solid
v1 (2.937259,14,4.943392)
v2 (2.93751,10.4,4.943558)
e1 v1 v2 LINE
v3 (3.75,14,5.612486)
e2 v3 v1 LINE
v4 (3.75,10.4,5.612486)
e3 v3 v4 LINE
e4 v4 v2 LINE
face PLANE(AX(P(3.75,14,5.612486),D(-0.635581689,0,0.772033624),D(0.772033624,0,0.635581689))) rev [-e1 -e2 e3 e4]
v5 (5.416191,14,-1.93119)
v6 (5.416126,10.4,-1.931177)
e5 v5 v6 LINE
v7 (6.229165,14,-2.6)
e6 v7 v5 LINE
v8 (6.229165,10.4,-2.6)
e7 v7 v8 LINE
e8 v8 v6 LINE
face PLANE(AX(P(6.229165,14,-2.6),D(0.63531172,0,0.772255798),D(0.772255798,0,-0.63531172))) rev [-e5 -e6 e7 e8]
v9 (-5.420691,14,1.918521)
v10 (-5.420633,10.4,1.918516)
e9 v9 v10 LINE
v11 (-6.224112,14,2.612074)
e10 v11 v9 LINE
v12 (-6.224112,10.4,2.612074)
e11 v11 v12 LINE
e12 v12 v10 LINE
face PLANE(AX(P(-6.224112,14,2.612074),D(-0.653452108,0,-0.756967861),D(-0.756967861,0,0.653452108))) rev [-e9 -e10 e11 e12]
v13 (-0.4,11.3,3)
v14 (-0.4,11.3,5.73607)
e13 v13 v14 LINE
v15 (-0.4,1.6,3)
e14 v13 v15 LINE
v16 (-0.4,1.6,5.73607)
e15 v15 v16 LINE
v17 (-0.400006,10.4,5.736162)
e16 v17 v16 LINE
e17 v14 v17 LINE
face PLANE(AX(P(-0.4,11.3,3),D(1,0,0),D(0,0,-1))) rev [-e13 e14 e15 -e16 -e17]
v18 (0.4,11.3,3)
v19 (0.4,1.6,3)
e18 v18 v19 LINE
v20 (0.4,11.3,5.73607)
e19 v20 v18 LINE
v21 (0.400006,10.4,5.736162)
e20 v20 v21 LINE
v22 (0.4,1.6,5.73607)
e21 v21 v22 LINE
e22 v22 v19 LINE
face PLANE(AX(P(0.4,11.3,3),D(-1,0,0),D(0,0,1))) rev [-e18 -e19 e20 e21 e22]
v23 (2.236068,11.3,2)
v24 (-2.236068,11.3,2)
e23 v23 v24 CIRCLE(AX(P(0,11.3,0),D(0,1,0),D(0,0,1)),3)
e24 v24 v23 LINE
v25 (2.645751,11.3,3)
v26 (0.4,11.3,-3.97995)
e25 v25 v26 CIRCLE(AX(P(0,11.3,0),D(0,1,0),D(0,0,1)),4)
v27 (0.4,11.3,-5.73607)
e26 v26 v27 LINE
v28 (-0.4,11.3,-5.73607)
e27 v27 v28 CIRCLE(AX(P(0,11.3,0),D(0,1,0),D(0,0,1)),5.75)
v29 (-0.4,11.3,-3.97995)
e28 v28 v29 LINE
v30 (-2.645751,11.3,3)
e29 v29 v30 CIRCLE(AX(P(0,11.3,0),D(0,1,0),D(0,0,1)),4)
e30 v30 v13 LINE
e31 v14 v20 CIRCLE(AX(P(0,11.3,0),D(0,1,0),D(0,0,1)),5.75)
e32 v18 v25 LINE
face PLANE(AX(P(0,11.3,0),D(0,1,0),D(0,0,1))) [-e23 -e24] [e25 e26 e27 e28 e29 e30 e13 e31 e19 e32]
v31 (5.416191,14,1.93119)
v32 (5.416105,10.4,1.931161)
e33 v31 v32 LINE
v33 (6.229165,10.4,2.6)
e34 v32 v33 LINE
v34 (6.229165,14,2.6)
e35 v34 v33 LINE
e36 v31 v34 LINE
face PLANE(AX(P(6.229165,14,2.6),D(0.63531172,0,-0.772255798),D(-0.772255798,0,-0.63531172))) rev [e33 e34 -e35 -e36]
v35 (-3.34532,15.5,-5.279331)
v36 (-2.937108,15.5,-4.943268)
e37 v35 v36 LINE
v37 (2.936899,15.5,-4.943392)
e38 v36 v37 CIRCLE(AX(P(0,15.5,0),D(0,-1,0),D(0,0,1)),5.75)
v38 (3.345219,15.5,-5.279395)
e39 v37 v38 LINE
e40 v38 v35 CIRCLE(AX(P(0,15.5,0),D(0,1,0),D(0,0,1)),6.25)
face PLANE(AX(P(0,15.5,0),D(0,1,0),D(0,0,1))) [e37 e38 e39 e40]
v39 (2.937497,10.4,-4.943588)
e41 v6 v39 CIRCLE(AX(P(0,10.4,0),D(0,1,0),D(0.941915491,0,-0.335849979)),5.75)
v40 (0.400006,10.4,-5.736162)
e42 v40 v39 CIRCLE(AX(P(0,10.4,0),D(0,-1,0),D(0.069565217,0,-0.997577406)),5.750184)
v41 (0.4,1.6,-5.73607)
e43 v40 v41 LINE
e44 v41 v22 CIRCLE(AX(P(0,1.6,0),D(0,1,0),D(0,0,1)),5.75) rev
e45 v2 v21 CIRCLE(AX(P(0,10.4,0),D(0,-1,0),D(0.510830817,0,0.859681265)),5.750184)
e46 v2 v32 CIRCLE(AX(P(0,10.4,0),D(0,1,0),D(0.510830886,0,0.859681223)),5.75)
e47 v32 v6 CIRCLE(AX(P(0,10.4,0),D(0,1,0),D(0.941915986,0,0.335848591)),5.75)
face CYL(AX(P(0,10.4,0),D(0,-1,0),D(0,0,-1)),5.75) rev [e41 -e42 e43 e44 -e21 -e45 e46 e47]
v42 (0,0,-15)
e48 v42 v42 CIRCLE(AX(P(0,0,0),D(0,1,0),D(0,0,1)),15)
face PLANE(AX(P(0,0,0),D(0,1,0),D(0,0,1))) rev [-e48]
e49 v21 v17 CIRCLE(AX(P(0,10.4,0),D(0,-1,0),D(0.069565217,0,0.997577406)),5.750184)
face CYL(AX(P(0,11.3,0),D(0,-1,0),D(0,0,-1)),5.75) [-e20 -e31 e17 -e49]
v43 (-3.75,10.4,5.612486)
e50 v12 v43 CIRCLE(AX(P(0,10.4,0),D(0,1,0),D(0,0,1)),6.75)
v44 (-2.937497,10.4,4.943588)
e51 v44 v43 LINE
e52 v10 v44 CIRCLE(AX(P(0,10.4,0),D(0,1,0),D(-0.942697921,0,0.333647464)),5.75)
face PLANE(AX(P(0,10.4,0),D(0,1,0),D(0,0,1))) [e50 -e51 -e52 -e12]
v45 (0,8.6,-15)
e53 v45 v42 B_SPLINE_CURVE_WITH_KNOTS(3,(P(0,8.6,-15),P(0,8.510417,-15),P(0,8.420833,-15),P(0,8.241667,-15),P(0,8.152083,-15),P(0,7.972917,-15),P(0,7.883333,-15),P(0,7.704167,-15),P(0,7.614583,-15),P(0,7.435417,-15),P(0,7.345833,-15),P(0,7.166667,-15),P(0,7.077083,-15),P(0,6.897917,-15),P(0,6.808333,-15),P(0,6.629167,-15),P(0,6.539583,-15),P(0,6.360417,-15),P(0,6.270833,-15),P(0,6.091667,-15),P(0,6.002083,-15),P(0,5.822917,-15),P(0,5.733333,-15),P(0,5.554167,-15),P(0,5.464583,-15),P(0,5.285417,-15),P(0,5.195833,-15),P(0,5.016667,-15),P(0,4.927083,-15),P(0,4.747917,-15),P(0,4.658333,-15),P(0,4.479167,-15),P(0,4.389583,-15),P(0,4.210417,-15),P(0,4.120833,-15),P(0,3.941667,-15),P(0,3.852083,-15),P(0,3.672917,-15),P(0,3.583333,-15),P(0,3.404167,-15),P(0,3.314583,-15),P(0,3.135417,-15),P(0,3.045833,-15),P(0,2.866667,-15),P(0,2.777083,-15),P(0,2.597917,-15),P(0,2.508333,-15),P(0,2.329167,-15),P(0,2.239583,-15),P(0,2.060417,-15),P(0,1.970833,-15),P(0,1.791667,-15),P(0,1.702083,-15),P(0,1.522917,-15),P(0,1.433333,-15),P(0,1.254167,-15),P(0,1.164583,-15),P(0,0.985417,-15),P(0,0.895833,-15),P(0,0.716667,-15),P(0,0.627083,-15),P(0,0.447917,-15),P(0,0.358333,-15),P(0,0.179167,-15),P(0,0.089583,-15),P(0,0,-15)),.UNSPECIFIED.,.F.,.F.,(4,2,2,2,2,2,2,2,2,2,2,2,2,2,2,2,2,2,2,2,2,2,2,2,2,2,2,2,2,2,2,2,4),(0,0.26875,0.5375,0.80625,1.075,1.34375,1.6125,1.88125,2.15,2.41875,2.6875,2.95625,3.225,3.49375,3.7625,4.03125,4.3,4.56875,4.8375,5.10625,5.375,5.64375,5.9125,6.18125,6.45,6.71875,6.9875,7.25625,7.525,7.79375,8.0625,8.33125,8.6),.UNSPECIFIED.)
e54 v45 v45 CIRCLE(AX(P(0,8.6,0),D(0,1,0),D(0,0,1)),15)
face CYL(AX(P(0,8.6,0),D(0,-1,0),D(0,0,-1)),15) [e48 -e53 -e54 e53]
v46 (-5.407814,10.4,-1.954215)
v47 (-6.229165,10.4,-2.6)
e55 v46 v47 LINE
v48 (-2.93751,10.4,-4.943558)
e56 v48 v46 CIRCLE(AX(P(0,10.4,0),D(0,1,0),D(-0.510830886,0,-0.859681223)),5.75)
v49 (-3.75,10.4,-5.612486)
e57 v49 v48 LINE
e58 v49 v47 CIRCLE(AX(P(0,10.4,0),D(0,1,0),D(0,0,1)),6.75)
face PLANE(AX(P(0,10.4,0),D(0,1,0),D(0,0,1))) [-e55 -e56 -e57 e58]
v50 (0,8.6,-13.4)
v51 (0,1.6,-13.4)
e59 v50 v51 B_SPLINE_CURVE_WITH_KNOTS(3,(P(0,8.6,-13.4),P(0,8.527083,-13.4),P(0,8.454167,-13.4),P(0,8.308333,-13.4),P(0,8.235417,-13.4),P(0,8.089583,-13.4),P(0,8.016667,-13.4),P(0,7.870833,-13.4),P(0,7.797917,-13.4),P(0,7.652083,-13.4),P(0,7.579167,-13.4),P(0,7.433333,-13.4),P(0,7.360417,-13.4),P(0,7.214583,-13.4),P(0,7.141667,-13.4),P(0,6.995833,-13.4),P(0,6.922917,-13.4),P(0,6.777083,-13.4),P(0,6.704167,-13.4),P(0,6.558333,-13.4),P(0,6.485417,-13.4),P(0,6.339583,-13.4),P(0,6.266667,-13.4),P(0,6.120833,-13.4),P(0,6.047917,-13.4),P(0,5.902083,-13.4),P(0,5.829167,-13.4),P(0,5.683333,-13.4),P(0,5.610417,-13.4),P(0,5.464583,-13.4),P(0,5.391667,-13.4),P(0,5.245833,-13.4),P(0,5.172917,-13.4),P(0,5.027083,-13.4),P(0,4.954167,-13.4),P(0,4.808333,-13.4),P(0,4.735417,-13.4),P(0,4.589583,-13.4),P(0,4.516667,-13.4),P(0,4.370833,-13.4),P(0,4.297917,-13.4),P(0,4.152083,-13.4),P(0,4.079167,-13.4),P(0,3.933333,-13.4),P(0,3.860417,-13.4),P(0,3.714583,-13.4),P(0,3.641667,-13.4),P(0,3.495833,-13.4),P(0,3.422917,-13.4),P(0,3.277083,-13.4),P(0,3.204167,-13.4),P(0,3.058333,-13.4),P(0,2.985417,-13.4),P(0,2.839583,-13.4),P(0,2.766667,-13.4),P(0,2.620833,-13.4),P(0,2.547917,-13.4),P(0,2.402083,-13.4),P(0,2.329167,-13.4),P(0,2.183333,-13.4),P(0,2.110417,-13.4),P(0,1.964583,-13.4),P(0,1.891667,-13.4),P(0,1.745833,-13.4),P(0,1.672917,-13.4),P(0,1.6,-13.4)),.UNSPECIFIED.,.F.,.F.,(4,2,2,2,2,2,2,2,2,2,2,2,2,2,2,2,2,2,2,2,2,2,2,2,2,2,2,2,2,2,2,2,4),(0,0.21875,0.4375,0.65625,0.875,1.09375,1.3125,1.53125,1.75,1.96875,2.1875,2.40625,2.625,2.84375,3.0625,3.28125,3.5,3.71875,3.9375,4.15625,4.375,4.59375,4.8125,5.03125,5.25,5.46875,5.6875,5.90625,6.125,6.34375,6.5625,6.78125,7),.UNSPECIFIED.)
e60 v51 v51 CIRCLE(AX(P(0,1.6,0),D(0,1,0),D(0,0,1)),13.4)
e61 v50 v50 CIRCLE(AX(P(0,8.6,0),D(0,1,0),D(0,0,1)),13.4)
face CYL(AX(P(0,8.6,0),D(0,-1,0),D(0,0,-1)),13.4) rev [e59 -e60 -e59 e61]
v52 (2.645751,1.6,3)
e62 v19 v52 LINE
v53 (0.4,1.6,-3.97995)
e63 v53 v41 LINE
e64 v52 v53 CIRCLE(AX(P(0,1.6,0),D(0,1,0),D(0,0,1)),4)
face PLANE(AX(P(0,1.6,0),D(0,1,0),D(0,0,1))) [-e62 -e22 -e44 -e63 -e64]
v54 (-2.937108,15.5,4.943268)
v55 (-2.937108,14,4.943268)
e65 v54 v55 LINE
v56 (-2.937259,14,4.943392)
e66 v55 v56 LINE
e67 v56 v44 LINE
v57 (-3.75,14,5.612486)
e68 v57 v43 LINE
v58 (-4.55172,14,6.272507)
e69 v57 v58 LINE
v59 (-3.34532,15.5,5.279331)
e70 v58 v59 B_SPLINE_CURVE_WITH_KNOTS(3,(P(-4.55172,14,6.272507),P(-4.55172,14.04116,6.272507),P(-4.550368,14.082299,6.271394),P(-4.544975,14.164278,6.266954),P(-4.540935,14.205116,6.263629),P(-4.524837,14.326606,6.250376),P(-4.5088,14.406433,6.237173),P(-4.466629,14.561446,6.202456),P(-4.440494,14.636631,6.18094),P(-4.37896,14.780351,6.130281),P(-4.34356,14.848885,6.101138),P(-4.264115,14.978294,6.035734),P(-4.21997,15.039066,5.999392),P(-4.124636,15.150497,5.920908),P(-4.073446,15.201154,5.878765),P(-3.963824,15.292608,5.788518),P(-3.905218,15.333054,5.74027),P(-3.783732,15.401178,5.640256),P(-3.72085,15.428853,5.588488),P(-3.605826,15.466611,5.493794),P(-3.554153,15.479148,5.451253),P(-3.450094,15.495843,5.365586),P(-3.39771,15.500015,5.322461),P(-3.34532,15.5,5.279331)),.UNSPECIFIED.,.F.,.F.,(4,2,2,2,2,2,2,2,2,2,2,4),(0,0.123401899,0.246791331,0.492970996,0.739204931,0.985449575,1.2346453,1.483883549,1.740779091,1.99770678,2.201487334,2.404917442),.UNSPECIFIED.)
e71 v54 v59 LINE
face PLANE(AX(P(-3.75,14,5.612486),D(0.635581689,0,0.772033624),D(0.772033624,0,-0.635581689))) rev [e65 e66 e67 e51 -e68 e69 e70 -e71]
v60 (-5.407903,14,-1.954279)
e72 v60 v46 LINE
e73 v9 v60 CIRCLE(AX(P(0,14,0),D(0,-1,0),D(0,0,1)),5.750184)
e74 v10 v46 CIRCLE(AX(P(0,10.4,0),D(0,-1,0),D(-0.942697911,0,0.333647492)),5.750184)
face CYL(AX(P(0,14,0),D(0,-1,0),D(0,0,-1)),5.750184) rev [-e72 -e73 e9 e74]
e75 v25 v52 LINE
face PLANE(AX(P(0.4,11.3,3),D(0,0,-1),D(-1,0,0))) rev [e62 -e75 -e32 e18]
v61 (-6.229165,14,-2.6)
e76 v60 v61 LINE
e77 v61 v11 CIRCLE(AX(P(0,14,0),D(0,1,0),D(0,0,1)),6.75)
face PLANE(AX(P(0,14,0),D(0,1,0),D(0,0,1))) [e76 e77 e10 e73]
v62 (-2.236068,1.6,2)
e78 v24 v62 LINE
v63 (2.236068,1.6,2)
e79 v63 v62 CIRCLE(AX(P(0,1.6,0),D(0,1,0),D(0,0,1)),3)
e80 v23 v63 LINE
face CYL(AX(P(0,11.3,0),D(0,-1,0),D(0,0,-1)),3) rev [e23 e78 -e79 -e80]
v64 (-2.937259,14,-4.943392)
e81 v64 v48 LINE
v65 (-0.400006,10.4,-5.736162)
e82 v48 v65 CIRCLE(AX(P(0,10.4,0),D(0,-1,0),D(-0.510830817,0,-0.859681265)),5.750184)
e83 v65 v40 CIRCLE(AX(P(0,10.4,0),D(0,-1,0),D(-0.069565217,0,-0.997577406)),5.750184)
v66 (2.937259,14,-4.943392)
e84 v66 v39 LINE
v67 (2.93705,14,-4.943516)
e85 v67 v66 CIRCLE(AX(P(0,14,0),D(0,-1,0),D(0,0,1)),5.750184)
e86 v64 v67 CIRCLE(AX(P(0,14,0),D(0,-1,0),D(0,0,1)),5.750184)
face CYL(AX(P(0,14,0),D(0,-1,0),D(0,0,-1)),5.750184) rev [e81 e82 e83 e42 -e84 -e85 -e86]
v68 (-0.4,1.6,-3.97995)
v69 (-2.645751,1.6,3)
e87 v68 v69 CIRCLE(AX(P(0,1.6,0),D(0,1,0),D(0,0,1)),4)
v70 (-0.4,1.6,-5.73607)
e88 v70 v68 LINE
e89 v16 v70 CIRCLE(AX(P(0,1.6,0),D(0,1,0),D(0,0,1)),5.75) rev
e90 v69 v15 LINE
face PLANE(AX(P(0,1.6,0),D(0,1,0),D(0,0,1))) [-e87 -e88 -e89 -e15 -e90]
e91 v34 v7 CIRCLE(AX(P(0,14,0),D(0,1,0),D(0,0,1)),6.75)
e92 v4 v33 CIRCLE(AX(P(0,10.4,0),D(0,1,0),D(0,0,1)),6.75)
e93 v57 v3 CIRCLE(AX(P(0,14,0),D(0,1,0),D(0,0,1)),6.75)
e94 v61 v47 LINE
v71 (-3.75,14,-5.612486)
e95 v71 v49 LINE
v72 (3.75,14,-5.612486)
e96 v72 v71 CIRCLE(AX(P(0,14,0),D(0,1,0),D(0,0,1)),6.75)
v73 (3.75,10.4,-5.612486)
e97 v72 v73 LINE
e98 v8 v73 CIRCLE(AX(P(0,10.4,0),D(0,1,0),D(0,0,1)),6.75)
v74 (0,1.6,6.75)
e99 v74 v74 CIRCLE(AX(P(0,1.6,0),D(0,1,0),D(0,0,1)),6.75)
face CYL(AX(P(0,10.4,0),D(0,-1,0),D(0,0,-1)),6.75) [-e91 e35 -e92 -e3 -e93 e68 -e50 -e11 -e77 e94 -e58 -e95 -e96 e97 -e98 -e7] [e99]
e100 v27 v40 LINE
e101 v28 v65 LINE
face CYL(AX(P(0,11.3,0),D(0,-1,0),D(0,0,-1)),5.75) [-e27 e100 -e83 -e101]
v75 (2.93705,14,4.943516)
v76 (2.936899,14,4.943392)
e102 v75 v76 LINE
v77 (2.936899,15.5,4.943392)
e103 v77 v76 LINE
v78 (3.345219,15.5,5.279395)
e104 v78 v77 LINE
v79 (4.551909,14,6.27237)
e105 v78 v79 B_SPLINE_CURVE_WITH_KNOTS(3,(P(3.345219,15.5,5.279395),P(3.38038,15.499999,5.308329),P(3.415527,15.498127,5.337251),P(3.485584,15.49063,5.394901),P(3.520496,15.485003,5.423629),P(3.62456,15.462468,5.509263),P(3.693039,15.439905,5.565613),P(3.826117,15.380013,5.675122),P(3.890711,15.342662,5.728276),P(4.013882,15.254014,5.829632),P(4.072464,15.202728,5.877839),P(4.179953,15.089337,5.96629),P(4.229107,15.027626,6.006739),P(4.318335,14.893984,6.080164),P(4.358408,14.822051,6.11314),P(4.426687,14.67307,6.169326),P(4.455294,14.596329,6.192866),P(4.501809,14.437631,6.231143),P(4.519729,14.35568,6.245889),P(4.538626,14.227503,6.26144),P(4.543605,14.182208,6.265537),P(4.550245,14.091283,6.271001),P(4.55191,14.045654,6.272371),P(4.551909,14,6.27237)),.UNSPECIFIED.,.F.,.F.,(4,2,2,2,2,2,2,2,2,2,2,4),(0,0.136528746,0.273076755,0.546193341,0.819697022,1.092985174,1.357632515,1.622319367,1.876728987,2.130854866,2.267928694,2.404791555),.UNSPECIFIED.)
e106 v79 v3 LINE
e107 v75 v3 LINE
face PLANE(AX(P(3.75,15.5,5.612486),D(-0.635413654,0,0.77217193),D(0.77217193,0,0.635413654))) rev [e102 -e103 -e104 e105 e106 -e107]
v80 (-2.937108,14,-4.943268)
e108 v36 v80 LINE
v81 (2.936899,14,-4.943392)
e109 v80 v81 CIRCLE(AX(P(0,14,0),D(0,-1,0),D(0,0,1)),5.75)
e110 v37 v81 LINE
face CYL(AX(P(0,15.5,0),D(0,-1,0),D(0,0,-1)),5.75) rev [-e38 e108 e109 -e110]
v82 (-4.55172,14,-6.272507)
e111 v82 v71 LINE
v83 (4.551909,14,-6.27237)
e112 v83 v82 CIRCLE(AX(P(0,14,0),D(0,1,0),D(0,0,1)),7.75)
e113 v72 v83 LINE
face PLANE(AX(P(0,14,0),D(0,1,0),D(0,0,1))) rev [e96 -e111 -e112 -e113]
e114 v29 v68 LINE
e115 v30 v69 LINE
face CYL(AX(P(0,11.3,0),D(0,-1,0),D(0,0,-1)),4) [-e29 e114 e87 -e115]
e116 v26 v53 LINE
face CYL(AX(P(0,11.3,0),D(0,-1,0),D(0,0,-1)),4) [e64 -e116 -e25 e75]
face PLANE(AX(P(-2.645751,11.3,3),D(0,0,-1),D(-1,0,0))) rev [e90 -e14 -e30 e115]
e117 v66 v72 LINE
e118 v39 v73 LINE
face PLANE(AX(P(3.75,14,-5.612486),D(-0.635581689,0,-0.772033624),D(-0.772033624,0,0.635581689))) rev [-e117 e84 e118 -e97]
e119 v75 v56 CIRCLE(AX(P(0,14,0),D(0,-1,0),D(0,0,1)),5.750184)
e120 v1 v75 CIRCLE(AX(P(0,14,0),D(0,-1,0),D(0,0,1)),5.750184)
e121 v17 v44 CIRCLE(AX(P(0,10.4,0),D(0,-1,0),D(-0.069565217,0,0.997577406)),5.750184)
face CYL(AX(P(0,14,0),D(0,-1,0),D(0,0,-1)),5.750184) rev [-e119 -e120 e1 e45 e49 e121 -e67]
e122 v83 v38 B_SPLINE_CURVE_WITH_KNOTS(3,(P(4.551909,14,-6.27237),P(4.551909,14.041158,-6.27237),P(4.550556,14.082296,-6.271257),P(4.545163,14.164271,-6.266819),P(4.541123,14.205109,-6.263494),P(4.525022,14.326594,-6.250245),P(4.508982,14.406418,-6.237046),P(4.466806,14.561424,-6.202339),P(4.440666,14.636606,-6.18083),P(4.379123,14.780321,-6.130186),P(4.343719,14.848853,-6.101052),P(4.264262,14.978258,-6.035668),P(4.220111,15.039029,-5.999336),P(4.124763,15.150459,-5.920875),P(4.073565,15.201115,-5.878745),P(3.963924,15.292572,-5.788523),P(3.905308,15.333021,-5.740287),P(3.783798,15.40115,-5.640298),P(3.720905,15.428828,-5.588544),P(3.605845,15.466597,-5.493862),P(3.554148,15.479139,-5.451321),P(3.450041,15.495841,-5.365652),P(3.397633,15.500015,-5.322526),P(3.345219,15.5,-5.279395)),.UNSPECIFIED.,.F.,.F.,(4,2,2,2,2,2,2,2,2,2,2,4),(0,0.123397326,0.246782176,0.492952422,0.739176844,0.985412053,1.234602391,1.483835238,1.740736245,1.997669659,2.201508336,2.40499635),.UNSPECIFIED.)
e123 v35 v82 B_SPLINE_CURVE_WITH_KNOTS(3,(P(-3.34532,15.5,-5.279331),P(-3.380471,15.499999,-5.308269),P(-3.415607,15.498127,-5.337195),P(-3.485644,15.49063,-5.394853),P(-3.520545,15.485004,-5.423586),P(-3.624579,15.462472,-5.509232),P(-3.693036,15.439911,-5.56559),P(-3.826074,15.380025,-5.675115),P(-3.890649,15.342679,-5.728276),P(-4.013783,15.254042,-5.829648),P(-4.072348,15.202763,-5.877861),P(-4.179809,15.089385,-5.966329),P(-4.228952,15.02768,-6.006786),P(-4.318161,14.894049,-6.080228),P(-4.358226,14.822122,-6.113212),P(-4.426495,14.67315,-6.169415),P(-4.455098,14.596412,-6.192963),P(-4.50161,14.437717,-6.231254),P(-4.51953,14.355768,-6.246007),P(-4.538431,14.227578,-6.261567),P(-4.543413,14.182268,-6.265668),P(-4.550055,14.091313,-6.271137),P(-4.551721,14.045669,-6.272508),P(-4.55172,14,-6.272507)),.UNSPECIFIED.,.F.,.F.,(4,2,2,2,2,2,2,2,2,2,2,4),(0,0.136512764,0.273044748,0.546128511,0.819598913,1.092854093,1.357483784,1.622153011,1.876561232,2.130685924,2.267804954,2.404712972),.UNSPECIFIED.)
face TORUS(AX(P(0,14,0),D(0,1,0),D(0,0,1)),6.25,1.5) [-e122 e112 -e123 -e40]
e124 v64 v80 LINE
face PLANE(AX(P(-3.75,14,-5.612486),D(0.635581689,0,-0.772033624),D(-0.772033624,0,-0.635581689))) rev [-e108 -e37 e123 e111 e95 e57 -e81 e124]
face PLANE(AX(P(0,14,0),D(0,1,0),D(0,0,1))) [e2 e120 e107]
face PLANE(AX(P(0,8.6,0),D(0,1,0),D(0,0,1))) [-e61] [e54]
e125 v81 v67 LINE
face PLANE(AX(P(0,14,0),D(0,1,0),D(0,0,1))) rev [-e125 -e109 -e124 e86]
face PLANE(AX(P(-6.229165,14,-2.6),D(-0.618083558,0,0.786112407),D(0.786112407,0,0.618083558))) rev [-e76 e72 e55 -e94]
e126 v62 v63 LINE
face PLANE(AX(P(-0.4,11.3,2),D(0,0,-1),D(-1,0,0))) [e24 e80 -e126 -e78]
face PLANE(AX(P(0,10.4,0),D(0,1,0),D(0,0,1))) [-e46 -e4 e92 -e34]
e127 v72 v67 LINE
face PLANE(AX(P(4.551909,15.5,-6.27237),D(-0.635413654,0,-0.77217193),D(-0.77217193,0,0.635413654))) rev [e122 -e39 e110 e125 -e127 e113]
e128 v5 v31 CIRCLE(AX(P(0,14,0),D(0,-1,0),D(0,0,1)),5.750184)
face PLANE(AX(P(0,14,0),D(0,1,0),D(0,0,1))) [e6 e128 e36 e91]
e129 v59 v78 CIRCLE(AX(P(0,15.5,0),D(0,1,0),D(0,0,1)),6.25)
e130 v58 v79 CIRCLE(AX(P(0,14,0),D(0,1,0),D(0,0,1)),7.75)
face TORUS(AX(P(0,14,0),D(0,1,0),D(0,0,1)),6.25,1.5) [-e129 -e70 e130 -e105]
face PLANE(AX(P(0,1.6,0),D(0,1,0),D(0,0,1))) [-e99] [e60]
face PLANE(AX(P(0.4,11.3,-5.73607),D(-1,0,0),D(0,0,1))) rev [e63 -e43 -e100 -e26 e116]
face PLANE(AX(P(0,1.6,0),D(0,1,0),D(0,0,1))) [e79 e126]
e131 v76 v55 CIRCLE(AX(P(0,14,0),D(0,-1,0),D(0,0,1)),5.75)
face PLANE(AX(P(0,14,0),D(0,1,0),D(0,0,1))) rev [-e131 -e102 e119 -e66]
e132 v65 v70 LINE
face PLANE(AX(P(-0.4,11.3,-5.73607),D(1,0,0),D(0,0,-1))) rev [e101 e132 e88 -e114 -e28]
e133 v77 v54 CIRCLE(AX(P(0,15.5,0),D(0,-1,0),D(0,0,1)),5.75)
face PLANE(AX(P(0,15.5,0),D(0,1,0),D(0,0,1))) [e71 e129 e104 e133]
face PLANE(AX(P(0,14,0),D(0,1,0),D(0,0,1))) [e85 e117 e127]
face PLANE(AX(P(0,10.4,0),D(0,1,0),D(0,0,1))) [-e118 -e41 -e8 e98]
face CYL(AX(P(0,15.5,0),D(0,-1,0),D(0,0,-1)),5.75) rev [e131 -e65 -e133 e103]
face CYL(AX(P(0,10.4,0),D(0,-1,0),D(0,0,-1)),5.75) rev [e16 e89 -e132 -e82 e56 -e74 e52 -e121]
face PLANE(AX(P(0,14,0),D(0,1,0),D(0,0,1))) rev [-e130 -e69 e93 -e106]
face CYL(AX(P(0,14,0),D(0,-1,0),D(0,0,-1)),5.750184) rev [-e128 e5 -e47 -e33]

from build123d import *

# Parameters (mm, degrees)
SKETCH_1_R      = 15
EXTRUDE_1_DEPTH = 8.6
SHELL_1_T       = -1.6
SKETCH_2_R      = 6.75
SKETCH_2_R_2    = 5.75
EXTRUDE_2_DEPTH = 8.8
EXTRUDE_4_DEPTH = 3.6
EXTRUDE_7_DEPTH = 1.5
FILLET_2_R      = 1.5
EXTRUDE_8_DEPTH = 9.7


with BuildPart() as part:
    # 草图1 → 凸台-拉伸1 (new body)
    with BuildSketch(Plane(origin=(0, 0, 0), x_dir=(1, 0, 0), z_dir=(0, 1, 0))):
        with Locations(Location((0, 0, 0), (0, 0, 90))):
            Circle(SKETCH_1_R)
    extrude(amount=EXTRUDE_1_DEPTH)

    # 抽壳1
    shell_1_openings = [part.faces().sort_by_distance(p)[0] for p in [
        (0, 8.6, 0),
    ]]
    offset(amount=SHELL_1_T, openings=shell_1_openings, kind=Kind.INTERSECTION)

    # 草图2 → 凸台-拉伸2 (add)
    with BuildSketch(Plane(origin=(0, 1.6, 0), x_dir=(1, 0, 0), z_dir=(0, 1, 0))):
        with Locations(Location((0, 0, 0), (0, 0, 270))):
            Circle(SKETCH_2_R)
        with Locations(Location((0, 0, 0), (0, 0, 270))):
            Circle(SKETCH_2_R_2, mode=Mode.SUBTRACT)
    extrude(amount=EXTRUDE_2_DEPTH)

    # 草图5 → 凸台-拉伸4 (add)
    with BuildSketch(Plane(origin=(0, 10.4, 0), x_dir=(1, 0, 0), z_dir=(0, 1, 0))):
        with BuildLine():
            Line((-6.229165273, 2.6), (-5.407902558, 1.954279393))
            ThreePointArc((-5.407902558, 1.954279393), (-5.750152822, 0.018988088), (-5.420691276, -1.918521336))
            Line((-5.420691276, -1.918521336), (-6.224112, -2.612073854))
            ThreePointArc((-6.224112, -2.612073854), (-6.749996828, -0.006544339), (-6.229165273, 2.6))
        make_face()
        with BuildLine():
            Line((-3.75, 5.61248608), (-2.937259379, 4.943392091))
            ThreePointArc((-2.937259379, 4.943392091), (0, 5.750184173), (2.937259379, 4.943392091))
            Line((2.937259379, 4.943392091), (3.75, 5.61248608))
            ThreePointArc((3.75, 5.61248608), (0, 6.75), (-3.75, 5.61248608))
        make_face()
        with BuildLine():
            Line((6.229165273, 2.6), (5.416190763, 1.931190215))
            ThreePointArc((5.416190763, 1.931190215), (5.750184173, 0), (5.416190763, -1.931190215))
            Line((5.416190763, -1.931190215), (6.229165273, -2.6))
            ThreePointArc((6.229165273, -2.6), (6.75, 0), (6.229165273, 2.6))
        make_face()
        with BuildLine():
            Line((3.75, -5.61248608), (2.937259379, -4.943392091))
            ThreePointArc((2.937259379, -4.943392091), (0, -5.750184173), (-2.937259379, -4.943392091))
            Line((-2.937259379, -4.943392091), (-3.75, -5.61248608))
            ThreePointArc((-3.75, -5.61248608), (0, -6.75), (3.75, -5.61248608))
        make_face()
    extrude(amount=EXTRUDE_4_DEPTH)

    # 草图14 → 凸台-拉伸7 (add)
    with BuildSketch(Plane(origin=(0, 14, 0), x_dir=(1, 0, 0), z_dir=(0, 1, 0))):
        with BuildLine():
            Line((-4.551719875, 6.272507169), (-3.75, 5.61248608))
            Line((-3.75, 5.61248608), (-2.937108239, 4.943267664))
            ThreePointArc((-2.937108239, 4.943267664), (-0.000121801, 5.749999999), (2.936898812, 4.943392091))
            Line((2.936898812, 4.943392091), (3.75, 5.61248608))
            Line((3.75, 5.61248608), (4.551908877, 6.272370013))
            ThreePointArc((4.551908877, 6.272370013), (0.000116762, 7.749999999), (-4.551719875, 6.272507169))
        make_face()
        with BuildLine():
            Line((4.551908877, -6.272370013), (3.75, -5.61248608))
            Line((3.75, -5.61248608), (2.936898812, -4.943392091))
            ThreePointArc((2.936898812, -4.943392091), (-0.000121801, -5.749999999), (-2.937108239, -4.943267664))
            Line((-2.937108239, -4.943267664), (-3.75, -5.61248608))
            Line((-3.75, -5.61248608), (-4.551719875, -6.272507169))
            ThreePointArc((-4.551719875, -6.272507169), (0.000116762, -7.749999999), (4.551908877, -6.272370013))
        make_face()
    extrude(amount=EXTRUDE_7_DEPTH)

    # 圆角2
    fillet_2_edges = [part.edges().sort_by_distance(p)[0] for p in [
        (0.000116762, 15.5, 7.749999999),
        (0.000116762, 15.5, -7.749999999),
    ]]
    fillet(fillet_2_edges, radius=FILLET_2_R - 0.0001)  # a hair under: the kernel refuses the full size

    # 草图15 → 凸台-拉伸8 (add)
    with BuildSketch(Plane(origin=(0, 1.6, 0), x_dir=(1, 0, 0), z_dir=(0, 1, 0))):
        with BuildLine():
            Line((-2.645751311, -3), (-0.4, -3))
            Line((-0.4, -3), (-0.4, -5.736070083))
            ThreePointArc((-0.4, -5.736070083), (0, -5.75), (0.4, -5.736070083))
            Line((0.4, -5.736070083), (0.4, -3))
            Line((0.4, -3), (2.645751311, -3))
            ThreePointArc((2.645751311, -3), (3.807765077, 1.22512249), (0.4, 3.979949748))
            Line((0.4, 3.979949748), (0.4, 5.736070083))
            ThreePointArc((0.4, 5.736070083), (0, 5.75), (-0.4, 5.736070083))
            Line((-0.4, 5.736070083), (-0.4, 3.979949748))
            ThreePointArc((-0.4, 3.979949748), (-3.807765077, 1.22512249), (-2.645751311, -3))
        make_face()
        with BuildLine():
            Line((1.407515289, -2), (0.4, -2))
            Line((0.4, -2), (-0.4, -2))
            Line((-0.4, -2), (-2.236067977, -2))
            ThreePointArc((-2.236067977, -2), (0, 3), (2.236067977, -2))
            Line((2.236067977, -2), (1.407515289, -2))
        make_face(mode=Mode.SUBTRACT)
    extrude(amount=EXTRUDE_8_DEPTH)


solid = part.part
